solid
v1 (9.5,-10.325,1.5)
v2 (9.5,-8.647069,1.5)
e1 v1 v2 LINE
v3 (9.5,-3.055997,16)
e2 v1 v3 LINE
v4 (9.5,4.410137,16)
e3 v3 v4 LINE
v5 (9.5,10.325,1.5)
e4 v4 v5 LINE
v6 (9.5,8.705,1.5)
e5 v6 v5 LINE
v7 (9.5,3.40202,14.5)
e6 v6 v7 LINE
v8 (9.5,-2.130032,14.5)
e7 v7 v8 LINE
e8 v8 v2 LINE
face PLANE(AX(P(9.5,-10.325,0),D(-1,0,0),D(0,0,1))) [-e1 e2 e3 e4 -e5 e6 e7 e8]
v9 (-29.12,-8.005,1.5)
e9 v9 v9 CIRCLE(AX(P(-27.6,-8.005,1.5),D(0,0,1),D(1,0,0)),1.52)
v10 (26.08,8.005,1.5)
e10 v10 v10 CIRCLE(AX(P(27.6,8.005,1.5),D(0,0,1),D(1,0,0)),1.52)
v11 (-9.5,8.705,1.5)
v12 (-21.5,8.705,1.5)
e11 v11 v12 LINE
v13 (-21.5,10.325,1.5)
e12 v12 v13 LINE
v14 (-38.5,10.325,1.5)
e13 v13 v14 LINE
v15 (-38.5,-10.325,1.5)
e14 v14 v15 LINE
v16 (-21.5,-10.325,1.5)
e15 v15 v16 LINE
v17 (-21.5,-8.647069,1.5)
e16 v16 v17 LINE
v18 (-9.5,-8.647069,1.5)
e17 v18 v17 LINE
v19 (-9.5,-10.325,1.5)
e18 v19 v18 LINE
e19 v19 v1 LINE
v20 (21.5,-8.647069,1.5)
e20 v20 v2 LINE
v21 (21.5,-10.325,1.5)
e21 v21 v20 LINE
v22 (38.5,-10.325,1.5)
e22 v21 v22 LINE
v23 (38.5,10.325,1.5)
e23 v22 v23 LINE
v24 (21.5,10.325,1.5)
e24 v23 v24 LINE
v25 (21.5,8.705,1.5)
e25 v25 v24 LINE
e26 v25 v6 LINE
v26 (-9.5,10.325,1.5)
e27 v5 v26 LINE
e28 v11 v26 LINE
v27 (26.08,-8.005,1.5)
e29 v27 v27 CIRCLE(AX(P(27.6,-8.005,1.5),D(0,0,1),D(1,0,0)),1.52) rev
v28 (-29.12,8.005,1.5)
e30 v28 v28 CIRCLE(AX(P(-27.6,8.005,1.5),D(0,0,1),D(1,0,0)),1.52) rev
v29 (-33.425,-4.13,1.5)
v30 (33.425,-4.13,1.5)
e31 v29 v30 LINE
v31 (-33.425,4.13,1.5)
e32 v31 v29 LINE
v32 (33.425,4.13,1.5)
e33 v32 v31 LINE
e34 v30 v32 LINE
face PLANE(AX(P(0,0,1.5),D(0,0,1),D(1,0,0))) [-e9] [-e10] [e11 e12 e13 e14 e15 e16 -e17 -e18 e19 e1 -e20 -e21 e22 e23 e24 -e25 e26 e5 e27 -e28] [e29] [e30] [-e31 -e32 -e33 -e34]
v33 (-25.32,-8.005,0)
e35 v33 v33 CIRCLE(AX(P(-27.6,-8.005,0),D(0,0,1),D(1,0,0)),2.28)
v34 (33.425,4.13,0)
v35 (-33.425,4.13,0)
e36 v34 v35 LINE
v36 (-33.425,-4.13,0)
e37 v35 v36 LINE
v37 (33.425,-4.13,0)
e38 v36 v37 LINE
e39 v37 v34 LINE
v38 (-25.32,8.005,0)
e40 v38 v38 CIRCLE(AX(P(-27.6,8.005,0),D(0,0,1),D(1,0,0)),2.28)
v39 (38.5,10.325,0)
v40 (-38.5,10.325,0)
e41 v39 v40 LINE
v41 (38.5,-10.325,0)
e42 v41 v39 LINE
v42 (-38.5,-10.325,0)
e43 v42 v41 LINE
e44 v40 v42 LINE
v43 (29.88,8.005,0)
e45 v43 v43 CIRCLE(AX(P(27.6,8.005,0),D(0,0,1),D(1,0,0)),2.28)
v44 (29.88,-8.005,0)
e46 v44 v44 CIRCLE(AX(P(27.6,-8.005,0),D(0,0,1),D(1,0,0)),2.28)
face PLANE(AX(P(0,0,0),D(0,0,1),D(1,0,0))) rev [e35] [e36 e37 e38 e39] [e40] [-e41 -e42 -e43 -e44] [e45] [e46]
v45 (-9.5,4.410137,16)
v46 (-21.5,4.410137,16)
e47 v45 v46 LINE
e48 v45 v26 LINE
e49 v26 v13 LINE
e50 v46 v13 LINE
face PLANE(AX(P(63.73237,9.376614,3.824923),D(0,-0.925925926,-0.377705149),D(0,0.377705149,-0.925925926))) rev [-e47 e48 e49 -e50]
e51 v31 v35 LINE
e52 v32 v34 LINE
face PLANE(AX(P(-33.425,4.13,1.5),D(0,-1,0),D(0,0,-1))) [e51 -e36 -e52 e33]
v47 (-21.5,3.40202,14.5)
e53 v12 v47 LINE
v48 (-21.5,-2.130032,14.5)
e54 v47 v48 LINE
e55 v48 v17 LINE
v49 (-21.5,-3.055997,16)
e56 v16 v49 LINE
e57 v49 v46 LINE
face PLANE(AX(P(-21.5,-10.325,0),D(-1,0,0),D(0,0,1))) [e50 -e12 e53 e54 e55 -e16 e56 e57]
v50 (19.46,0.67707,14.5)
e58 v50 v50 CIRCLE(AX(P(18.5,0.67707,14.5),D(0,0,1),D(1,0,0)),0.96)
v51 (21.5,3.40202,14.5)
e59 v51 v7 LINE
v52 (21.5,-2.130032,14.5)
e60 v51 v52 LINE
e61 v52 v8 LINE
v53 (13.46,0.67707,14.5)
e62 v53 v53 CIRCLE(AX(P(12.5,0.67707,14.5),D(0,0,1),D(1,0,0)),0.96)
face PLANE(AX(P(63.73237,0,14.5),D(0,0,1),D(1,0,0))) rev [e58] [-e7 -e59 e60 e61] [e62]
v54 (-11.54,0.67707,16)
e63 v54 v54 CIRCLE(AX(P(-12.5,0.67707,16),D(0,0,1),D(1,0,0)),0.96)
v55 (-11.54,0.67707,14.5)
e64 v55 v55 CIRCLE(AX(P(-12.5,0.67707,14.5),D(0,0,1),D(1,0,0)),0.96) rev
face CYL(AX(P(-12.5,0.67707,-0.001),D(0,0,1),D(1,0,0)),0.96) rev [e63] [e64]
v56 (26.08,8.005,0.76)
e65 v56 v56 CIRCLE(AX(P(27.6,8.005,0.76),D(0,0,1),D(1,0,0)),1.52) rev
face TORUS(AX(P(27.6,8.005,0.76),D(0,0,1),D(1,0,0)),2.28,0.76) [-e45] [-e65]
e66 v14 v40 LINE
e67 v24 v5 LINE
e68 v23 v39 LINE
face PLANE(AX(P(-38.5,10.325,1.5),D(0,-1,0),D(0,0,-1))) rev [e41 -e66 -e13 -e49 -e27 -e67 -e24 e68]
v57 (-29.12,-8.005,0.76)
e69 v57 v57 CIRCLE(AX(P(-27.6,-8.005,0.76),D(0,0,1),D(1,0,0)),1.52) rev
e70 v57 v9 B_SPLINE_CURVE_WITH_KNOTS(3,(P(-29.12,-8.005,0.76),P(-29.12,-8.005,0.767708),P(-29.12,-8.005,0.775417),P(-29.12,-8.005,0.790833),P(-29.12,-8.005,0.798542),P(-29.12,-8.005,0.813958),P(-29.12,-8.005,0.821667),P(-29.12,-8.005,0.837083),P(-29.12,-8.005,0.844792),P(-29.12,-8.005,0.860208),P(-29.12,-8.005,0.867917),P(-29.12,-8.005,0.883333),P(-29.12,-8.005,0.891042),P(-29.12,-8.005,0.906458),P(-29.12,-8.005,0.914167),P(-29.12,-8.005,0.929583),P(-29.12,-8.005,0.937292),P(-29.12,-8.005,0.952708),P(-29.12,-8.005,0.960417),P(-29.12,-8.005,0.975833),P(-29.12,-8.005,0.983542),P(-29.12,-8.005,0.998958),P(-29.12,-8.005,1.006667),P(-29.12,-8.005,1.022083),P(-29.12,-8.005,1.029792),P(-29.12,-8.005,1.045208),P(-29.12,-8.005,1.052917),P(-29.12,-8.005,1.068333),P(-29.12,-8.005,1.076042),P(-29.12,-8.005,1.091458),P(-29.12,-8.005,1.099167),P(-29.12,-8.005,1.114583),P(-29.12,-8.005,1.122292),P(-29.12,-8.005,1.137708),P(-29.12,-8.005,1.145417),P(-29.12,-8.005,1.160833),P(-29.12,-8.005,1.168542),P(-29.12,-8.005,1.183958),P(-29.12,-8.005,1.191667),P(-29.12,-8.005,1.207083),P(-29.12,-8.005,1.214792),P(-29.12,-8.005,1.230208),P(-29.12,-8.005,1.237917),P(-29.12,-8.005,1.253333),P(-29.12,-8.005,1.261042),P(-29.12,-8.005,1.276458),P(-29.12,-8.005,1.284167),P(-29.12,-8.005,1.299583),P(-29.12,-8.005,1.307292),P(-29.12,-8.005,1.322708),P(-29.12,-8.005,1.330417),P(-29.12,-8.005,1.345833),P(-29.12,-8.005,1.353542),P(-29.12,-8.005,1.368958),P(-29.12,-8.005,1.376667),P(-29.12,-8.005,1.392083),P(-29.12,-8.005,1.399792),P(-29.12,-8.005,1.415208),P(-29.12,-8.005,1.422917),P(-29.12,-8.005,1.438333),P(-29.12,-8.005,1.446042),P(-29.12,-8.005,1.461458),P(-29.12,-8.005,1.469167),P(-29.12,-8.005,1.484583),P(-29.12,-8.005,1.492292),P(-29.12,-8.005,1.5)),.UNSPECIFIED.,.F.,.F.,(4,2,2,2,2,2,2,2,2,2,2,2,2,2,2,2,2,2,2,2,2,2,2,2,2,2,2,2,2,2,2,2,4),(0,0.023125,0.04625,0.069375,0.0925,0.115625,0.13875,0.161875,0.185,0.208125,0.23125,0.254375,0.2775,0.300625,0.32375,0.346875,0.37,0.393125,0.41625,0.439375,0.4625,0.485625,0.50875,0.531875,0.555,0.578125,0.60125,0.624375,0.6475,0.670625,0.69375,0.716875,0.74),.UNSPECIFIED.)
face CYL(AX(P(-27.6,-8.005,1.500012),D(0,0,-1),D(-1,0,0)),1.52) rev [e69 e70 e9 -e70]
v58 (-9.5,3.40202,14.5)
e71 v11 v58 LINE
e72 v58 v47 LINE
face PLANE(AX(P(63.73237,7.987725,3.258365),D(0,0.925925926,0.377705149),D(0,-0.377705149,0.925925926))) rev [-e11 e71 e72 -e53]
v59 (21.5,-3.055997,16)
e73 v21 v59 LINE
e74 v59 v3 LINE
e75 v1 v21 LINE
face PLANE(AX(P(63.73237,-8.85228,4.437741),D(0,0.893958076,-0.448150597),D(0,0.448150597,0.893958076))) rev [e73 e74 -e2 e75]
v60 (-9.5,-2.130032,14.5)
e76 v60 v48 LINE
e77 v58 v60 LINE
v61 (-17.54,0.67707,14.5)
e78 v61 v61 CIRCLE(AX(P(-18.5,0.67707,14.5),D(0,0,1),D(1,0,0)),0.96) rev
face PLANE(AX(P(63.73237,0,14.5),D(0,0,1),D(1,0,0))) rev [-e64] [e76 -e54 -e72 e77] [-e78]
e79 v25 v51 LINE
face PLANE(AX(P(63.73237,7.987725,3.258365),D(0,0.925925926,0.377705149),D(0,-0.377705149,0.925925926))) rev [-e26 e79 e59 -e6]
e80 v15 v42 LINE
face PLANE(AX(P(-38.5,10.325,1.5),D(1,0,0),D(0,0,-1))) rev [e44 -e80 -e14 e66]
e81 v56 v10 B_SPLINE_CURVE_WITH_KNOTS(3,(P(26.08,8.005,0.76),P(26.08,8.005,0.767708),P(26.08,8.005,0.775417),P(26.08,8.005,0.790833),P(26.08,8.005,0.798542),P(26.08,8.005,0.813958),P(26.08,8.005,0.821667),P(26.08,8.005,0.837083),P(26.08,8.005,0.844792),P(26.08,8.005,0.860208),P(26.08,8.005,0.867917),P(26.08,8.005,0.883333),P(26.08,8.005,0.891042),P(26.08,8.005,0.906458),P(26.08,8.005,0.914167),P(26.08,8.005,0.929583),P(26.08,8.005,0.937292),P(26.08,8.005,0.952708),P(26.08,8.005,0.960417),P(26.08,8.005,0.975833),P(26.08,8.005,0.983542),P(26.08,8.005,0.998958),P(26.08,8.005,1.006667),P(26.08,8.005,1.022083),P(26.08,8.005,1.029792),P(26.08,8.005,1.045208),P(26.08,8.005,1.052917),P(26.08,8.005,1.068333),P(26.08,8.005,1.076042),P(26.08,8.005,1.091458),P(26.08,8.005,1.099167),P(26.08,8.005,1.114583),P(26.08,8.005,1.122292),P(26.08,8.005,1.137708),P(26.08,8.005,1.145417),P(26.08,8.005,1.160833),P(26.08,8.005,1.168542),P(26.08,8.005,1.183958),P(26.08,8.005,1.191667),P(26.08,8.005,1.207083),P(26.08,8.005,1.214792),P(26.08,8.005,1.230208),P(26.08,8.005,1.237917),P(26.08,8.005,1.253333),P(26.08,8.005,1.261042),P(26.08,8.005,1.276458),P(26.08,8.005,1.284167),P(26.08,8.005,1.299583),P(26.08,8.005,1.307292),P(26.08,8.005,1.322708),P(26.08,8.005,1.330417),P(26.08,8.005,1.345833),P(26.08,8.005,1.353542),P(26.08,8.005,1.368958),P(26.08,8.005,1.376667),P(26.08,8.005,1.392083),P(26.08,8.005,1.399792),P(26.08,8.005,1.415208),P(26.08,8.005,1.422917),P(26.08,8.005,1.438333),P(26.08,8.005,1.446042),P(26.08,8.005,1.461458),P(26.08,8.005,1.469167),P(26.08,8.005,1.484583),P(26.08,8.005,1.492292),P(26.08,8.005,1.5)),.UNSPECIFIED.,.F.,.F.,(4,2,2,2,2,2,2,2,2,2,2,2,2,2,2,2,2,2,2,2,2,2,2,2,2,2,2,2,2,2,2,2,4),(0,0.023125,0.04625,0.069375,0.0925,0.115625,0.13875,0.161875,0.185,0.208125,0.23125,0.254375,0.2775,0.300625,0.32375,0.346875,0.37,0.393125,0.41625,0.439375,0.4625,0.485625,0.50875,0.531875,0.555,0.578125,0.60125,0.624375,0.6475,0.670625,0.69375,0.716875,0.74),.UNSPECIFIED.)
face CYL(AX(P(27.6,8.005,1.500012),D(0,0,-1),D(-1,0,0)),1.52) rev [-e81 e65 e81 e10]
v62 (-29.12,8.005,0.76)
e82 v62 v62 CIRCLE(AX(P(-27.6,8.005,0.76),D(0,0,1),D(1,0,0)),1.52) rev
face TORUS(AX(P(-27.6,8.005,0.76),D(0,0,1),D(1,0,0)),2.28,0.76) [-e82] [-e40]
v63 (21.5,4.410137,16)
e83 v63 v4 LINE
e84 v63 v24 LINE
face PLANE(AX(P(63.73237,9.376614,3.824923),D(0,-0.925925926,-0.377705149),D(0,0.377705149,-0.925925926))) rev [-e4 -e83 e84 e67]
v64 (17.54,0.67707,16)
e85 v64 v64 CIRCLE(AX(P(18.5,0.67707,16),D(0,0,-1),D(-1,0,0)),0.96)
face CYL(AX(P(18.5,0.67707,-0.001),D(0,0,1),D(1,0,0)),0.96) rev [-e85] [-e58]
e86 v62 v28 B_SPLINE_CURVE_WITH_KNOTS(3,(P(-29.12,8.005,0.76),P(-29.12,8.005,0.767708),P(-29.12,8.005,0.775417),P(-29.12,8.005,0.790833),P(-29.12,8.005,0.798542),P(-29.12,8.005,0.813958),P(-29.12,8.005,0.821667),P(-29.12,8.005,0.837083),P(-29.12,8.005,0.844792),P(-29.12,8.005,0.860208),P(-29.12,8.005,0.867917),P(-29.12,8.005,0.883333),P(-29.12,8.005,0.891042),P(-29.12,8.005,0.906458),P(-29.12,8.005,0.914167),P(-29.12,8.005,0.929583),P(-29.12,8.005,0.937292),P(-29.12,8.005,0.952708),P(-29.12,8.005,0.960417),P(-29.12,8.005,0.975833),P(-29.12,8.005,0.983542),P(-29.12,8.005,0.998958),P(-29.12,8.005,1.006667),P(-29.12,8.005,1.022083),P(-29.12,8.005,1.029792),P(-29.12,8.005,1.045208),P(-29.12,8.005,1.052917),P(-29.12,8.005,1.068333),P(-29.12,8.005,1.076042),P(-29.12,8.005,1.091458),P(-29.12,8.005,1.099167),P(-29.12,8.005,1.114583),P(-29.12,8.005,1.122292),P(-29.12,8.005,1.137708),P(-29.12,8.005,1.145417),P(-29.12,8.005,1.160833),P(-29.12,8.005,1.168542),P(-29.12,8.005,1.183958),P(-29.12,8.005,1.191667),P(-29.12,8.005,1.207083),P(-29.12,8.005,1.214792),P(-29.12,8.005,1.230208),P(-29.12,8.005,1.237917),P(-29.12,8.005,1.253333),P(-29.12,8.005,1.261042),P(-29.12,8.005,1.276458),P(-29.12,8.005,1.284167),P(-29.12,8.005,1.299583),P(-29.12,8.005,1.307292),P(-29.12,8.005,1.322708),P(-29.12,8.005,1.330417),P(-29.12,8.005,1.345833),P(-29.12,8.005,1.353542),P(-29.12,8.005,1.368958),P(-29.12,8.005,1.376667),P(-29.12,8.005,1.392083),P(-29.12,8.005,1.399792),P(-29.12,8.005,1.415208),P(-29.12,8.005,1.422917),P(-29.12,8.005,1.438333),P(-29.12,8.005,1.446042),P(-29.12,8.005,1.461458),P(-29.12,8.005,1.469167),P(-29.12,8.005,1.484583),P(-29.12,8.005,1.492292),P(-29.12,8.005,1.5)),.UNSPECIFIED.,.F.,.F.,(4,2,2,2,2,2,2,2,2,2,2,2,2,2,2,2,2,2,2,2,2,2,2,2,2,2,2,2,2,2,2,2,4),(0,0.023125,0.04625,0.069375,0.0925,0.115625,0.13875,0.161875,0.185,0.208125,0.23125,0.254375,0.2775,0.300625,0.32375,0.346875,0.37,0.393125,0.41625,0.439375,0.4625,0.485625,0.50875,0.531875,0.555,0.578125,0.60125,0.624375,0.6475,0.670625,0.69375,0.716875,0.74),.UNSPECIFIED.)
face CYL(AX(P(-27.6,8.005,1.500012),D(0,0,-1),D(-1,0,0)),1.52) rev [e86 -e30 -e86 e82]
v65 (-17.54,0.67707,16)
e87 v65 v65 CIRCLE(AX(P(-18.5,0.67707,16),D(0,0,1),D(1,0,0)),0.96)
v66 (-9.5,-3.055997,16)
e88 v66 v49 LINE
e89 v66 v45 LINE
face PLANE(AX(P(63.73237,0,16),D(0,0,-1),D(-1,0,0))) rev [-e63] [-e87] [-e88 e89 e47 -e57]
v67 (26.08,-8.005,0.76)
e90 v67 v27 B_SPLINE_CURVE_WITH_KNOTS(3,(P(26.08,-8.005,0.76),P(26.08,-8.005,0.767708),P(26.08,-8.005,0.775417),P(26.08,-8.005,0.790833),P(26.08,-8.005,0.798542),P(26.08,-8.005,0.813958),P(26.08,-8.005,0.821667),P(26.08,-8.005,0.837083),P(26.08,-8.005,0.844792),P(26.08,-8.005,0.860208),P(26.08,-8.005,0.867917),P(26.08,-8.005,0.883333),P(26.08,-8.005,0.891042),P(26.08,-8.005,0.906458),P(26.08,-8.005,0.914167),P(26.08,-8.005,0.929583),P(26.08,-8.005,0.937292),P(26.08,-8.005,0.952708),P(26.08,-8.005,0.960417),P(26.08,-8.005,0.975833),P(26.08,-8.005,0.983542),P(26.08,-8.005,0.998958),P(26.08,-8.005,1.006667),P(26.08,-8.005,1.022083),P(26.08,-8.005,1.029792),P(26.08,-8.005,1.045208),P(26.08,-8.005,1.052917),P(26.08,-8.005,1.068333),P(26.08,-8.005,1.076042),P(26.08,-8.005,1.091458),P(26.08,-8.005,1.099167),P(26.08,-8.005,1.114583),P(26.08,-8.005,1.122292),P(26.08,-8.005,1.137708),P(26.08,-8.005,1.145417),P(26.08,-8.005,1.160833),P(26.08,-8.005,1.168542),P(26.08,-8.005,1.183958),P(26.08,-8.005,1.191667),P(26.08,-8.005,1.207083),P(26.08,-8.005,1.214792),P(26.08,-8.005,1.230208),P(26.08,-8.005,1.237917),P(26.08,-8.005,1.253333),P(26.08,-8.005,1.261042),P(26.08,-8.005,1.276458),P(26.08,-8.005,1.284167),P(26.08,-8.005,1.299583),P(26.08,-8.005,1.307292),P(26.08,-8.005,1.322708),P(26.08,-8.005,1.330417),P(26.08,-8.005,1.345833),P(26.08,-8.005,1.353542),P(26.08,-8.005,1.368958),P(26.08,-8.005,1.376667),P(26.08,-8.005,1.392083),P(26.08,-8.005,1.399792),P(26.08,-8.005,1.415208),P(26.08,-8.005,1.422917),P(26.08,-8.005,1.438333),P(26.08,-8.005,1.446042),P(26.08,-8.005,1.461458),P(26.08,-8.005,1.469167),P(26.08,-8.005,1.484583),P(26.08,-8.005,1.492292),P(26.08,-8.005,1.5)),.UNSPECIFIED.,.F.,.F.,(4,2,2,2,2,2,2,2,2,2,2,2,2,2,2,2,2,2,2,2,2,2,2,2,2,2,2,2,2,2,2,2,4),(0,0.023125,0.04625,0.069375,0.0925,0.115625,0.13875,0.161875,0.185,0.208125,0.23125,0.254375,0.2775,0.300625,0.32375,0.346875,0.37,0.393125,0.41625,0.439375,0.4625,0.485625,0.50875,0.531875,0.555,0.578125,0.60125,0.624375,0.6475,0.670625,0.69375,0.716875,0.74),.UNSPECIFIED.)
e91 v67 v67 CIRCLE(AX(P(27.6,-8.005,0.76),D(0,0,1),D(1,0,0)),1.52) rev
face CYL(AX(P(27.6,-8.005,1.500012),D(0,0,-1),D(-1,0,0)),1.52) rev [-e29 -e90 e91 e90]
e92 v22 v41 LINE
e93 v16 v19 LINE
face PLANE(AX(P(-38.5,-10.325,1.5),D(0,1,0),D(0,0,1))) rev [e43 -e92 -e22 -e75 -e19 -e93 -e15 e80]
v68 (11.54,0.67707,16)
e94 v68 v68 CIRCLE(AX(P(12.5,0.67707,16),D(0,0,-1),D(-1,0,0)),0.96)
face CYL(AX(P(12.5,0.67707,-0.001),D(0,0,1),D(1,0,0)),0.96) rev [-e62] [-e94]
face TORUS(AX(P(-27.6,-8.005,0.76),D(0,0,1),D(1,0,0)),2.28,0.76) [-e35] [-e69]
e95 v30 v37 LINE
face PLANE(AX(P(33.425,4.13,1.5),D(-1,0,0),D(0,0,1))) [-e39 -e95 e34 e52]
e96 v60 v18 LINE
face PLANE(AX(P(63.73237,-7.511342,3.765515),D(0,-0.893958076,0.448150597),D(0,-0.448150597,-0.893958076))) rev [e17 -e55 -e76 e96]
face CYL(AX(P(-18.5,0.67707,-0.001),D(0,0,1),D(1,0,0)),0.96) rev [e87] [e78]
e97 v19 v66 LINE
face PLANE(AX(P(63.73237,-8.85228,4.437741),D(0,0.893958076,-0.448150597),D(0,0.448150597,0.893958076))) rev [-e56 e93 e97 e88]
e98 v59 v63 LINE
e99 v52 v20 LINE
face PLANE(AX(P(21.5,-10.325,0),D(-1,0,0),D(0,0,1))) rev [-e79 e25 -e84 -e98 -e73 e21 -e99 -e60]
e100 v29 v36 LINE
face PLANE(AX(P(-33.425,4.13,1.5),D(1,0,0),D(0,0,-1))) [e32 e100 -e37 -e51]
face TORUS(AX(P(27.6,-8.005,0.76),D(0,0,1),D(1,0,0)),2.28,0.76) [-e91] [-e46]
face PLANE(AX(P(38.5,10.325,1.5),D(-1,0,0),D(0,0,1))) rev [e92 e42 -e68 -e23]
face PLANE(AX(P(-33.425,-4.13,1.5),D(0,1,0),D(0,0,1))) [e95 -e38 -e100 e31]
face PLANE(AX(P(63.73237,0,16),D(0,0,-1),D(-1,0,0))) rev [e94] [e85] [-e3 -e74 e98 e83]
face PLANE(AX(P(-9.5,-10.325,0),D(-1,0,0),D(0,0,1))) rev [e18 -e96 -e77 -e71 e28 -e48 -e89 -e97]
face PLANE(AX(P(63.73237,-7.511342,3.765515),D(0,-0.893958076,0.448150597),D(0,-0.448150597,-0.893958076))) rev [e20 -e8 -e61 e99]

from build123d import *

# Parameters (mm, degrees)
SKETCH1_W                      = 77
SKETCH1_H                      = 20.65
SKETCH1_W_2                    = 66.85
SKETCH1_H_2                    = 8.26
BOSS_EXTRUDE1_DEPTH            = 1.5
CUT_EXTRUDE1_REACH             = 41.889
SKETCH2_R                      = 1.52
CUT_EXTRUDE1_DIRECTION_2_DEPTH = 40.88866537
FILLET1_R                      = 0.76
FILLET1_OF_MIRROR1_R           = 0.76
BOSS_EXTRUDE2_REACH            = 79.704
CUT_EXTRUDE2_START             = -20.65
CUT_EXTRUDE2_OUTLINE_W         = 19
CUT_EXTRUDE2_OUTLINE_H         = 14.5
CUT_EXTRUDE2_OUTLINE_W_2       = 17
CUT_EXTRUDE2_DEPTH             = 20.65
CUT_EXTRUDE3_REACH             = 44.952
SKETCH5_R                      = 0.96


# Read off the part's stored shape, not the designer's step: Mirror2, Cut-Extrude2
with BuildPart() as part:
    # Sketch1 → Boss-Extrude1 (new body)
    with BuildSketch(Plane.XY):
        Rectangle(SKETCH1_W, SKETCH1_H)
        Rectangle(SKETCH1_W_2, SKETCH1_H_2, mode=Mode.SUBTRACT)
    extrude(amount=BOSS_EXTRUDE1_DEPTH)

    # Sketch2 → Cut-Extrude1 (cut, up to next)
    with BuildSketch(Plane.XY.offset(1.5), mode=Mode.PRIVATE) as cut_extrude1_sk1:
        with Locations(Location((-27.6, 8.005, 0), (0, 0, 180))):
            Circle(SKETCH2_R)
    cut_extrude1_tool1 = extrude(cut_extrude1_sk1.sketch, amount=-CUT_EXTRUDE1_REACH, mode=Mode.PRIVATE) & part.part
    cut_extrude1 = cut_extrude1_tool1.solids().sort_by_distance((-27.6, 8.005, 1.5))[0]
    add(cut_extrude1, mode=Mode.SUBTRACT)

    # Sketch2 → Cut-Extrude1 direction 2 (cut)
    with BuildSketch(Plane.XY.offset(1.5)):
        with Locations(Location((-27.6, 8.005, 0), (0, 0, 180))):
            Circle(SKETCH2_R)
    cut_extrude1_direction_2 = extrude(amount=CUT_EXTRUDE1_DIRECTION_2_DEPTH, mode=Mode.SUBTRACT)

    # Fillet1
    fillet1_edges = [part.edges().sort_by_distance(p)[0] for p in [
        (-26.08, 8.005, 0),
    ]]
    fillet(fillet1_edges, radius=FILLET1_R)

    # Mirror1: Cut-Extrude1, Cut-Extrude1 direction 2 across plane
    add(cut_extrude1.mirror(Plane.ZX), mode=Mode.SUBTRACT)
    add(cut_extrude1_direction_2.mirror(Plane.ZX), mode=Mode.SUBTRACT)

    # Fillet1 of Mirror1
    fillet1_of_mirror1_edges = [part.edges().sort_by_distance(p)[0] for p in [
        (-26.08, -8.005, 0),
    ]]
    fillet(fillet1_of_mirror1_edges, radius=FILLET1_OF_MIRROR1_R)

    # Mirror2 outline → Mirror2 (revolve, cut)
    with BuildSketch(Plane(origin=(27.6, 8.005, 0), x_dir=(1, 0, 0), z_dir=(0, -1, 0))):
        with BuildLine():
            Line((1.52, 0.76), (1.52, 1.5))
            Line((1.52, 1.5), (0, 1.5))
            Line((0, 1.5), (0, 0))
            Line((0, 0), (2.28, 0))
            ThreePointArc((2.28, 0), (1.742598846, 0.222598846), (1.52, 0.76))
        make_face()
    revolve(axis=Axis((27.6, 8.005, 0), (0, 0, 1)), mode=Mode.SUBTRACT)

    # Mirror2 2 outline → Mirror2 2 (revolve, cut)
    with BuildSketch(Plane(origin=(27.6, -8.005, 0), x_dir=(1, 0, 0), z_dir=(0, -1, 0))):
        with BuildLine():
            Line((1.52, 0.76), (1.52, 1.5))
            Line((1.52, 1.5), (0, 1.5))
            Line((0, 1.5), (0, 0))
            Line((0, 0), (2.28, 0))
            ThreePointArc((2.28, 0), (1.742598846, 0.222598846), (1.52, 0.76))
        make_face()
    revolve(axis=Axis((27.6, -8.005, 0), (0, 0, 1)), mode=Mode.SUBTRACT)

    # Boss-Extrude2: up to this face of the body (flat: up to its plane)
    boss_extrude2_end = Plane(part.part.faces().sort_by_distance((38.5, 0, 0.75))[0])
    # Sketch3 → Boss-Extrude2 (add, up to the picked face)
    with BuildSketch(Plane.ZY.offset(38.5), mode=Mode.PRIVATE) as boss_extrude2_sk1:
        Polygon((16, 4.410137364), (1.5, 10.325), (1.5, 8.705), (14.5, 3.402019706), (14.5, -2.130032078), (1.5, -8.647068966), (1.5, -10.325), (16, -3.055997317), align=None)
    boss_extrude2_tool1 = split(extrude(boss_extrude2_sk1.sketch, amount=-BOSS_EXTRUDE2_REACH, mode=Mode.PRIVATE), bisect_by=boss_extrude2_end, keep=Keep.BOTH, mode=Mode.PRIVATE)
    add(boss_extrude2_tool1.solids().sort_by(Axis((-38.5, 0.67707, 15.747676), (1, 0, 0)))[0])

    # Cut-Extrude2 outline → Cut-Extrude2 (cut)
    with BuildSketch(Plane(origin=(0, 10.325, 0), x_dir=(1, 0, 0), z_dir=(0, 1, 0)).offset(CUT_EXTRUDE2_START)):
        with Locations((0, -8.75)):
            Rectangle(CUT_EXTRUDE2_OUTLINE_W, CUT_EXTRUDE2_OUTLINE_H)
        with Locations((30, -8.75)):
            Rectangle(CUT_EXTRUDE2_OUTLINE_W_2, CUT_EXTRUDE2_OUTLINE_H)
        with Locations((-30, -8.75)):
            Rectangle(CUT_EXTRUDE2_OUTLINE_W_2, CUT_EXTRUDE2_OUTLINE_H)
    extrude(amount=CUT_EXTRUDE2_DEPTH, mode=Mode.SUBTRACT)

    # Sketch5 → Cut-Extrude3 (cut, up to next)
    with BuildSketch(Plane.XY.offset(16), mode=Mode.PRIVATE) as cut_extrude3_sk1:
        with Locations((-12.5, 0.677070023)):
            Circle(SKETCH5_R)
    cut_extrude3_tool1 = extrude(cut_extrude3_sk1.sketch, amount=-CUT_EXTRUDE3_REACH, mode=Mode.PRIVATE) & part.part
    # Sketch5 → Cut-Extrude3 (cut, up to next)
    with BuildSketch(Plane.XY.offset(16), mode=Mode.PRIVATE) as cut_extrude3_sk2:
        with Locations((-18.5, 0.677070023)):
            Circle(SKETCH5_R)
    cut_extrude3_tool2 = extrude(cut_extrude3_sk2.sketch, amount=-CUT_EXTRUDE3_REACH, mode=Mode.PRIVATE) & part.part
    cut_extrude3_1 = cut_extrude3_tool1.solids().sort_by_distance((-12.5, 0.67707, 16))[0]
    add(cut_extrude3_1, mode=Mode.SUBTRACT)
    cut_extrude3_2 = cut_extrude3_tool2.solids().sort_by_distance((-18.5, 0.67707, 16))[0]
    add(cut_extrude3_2, mode=Mode.SUBTRACT)
    cut_extrude3 = cut_extrude3_1 + cut_extrude3_2  # Cut-Extrude3 as one shape, for the pattern or mirror that repeats it

    # Mirror3: Cut-Extrude3 across plane
    add(cut_extrude3.mirror(Plane(origin=(0, 0, 0), x_dir=(0, 0, 1), z_dir=(1, 0, 0))), mode=Mode.SUBTRACT)


solid = part.part
